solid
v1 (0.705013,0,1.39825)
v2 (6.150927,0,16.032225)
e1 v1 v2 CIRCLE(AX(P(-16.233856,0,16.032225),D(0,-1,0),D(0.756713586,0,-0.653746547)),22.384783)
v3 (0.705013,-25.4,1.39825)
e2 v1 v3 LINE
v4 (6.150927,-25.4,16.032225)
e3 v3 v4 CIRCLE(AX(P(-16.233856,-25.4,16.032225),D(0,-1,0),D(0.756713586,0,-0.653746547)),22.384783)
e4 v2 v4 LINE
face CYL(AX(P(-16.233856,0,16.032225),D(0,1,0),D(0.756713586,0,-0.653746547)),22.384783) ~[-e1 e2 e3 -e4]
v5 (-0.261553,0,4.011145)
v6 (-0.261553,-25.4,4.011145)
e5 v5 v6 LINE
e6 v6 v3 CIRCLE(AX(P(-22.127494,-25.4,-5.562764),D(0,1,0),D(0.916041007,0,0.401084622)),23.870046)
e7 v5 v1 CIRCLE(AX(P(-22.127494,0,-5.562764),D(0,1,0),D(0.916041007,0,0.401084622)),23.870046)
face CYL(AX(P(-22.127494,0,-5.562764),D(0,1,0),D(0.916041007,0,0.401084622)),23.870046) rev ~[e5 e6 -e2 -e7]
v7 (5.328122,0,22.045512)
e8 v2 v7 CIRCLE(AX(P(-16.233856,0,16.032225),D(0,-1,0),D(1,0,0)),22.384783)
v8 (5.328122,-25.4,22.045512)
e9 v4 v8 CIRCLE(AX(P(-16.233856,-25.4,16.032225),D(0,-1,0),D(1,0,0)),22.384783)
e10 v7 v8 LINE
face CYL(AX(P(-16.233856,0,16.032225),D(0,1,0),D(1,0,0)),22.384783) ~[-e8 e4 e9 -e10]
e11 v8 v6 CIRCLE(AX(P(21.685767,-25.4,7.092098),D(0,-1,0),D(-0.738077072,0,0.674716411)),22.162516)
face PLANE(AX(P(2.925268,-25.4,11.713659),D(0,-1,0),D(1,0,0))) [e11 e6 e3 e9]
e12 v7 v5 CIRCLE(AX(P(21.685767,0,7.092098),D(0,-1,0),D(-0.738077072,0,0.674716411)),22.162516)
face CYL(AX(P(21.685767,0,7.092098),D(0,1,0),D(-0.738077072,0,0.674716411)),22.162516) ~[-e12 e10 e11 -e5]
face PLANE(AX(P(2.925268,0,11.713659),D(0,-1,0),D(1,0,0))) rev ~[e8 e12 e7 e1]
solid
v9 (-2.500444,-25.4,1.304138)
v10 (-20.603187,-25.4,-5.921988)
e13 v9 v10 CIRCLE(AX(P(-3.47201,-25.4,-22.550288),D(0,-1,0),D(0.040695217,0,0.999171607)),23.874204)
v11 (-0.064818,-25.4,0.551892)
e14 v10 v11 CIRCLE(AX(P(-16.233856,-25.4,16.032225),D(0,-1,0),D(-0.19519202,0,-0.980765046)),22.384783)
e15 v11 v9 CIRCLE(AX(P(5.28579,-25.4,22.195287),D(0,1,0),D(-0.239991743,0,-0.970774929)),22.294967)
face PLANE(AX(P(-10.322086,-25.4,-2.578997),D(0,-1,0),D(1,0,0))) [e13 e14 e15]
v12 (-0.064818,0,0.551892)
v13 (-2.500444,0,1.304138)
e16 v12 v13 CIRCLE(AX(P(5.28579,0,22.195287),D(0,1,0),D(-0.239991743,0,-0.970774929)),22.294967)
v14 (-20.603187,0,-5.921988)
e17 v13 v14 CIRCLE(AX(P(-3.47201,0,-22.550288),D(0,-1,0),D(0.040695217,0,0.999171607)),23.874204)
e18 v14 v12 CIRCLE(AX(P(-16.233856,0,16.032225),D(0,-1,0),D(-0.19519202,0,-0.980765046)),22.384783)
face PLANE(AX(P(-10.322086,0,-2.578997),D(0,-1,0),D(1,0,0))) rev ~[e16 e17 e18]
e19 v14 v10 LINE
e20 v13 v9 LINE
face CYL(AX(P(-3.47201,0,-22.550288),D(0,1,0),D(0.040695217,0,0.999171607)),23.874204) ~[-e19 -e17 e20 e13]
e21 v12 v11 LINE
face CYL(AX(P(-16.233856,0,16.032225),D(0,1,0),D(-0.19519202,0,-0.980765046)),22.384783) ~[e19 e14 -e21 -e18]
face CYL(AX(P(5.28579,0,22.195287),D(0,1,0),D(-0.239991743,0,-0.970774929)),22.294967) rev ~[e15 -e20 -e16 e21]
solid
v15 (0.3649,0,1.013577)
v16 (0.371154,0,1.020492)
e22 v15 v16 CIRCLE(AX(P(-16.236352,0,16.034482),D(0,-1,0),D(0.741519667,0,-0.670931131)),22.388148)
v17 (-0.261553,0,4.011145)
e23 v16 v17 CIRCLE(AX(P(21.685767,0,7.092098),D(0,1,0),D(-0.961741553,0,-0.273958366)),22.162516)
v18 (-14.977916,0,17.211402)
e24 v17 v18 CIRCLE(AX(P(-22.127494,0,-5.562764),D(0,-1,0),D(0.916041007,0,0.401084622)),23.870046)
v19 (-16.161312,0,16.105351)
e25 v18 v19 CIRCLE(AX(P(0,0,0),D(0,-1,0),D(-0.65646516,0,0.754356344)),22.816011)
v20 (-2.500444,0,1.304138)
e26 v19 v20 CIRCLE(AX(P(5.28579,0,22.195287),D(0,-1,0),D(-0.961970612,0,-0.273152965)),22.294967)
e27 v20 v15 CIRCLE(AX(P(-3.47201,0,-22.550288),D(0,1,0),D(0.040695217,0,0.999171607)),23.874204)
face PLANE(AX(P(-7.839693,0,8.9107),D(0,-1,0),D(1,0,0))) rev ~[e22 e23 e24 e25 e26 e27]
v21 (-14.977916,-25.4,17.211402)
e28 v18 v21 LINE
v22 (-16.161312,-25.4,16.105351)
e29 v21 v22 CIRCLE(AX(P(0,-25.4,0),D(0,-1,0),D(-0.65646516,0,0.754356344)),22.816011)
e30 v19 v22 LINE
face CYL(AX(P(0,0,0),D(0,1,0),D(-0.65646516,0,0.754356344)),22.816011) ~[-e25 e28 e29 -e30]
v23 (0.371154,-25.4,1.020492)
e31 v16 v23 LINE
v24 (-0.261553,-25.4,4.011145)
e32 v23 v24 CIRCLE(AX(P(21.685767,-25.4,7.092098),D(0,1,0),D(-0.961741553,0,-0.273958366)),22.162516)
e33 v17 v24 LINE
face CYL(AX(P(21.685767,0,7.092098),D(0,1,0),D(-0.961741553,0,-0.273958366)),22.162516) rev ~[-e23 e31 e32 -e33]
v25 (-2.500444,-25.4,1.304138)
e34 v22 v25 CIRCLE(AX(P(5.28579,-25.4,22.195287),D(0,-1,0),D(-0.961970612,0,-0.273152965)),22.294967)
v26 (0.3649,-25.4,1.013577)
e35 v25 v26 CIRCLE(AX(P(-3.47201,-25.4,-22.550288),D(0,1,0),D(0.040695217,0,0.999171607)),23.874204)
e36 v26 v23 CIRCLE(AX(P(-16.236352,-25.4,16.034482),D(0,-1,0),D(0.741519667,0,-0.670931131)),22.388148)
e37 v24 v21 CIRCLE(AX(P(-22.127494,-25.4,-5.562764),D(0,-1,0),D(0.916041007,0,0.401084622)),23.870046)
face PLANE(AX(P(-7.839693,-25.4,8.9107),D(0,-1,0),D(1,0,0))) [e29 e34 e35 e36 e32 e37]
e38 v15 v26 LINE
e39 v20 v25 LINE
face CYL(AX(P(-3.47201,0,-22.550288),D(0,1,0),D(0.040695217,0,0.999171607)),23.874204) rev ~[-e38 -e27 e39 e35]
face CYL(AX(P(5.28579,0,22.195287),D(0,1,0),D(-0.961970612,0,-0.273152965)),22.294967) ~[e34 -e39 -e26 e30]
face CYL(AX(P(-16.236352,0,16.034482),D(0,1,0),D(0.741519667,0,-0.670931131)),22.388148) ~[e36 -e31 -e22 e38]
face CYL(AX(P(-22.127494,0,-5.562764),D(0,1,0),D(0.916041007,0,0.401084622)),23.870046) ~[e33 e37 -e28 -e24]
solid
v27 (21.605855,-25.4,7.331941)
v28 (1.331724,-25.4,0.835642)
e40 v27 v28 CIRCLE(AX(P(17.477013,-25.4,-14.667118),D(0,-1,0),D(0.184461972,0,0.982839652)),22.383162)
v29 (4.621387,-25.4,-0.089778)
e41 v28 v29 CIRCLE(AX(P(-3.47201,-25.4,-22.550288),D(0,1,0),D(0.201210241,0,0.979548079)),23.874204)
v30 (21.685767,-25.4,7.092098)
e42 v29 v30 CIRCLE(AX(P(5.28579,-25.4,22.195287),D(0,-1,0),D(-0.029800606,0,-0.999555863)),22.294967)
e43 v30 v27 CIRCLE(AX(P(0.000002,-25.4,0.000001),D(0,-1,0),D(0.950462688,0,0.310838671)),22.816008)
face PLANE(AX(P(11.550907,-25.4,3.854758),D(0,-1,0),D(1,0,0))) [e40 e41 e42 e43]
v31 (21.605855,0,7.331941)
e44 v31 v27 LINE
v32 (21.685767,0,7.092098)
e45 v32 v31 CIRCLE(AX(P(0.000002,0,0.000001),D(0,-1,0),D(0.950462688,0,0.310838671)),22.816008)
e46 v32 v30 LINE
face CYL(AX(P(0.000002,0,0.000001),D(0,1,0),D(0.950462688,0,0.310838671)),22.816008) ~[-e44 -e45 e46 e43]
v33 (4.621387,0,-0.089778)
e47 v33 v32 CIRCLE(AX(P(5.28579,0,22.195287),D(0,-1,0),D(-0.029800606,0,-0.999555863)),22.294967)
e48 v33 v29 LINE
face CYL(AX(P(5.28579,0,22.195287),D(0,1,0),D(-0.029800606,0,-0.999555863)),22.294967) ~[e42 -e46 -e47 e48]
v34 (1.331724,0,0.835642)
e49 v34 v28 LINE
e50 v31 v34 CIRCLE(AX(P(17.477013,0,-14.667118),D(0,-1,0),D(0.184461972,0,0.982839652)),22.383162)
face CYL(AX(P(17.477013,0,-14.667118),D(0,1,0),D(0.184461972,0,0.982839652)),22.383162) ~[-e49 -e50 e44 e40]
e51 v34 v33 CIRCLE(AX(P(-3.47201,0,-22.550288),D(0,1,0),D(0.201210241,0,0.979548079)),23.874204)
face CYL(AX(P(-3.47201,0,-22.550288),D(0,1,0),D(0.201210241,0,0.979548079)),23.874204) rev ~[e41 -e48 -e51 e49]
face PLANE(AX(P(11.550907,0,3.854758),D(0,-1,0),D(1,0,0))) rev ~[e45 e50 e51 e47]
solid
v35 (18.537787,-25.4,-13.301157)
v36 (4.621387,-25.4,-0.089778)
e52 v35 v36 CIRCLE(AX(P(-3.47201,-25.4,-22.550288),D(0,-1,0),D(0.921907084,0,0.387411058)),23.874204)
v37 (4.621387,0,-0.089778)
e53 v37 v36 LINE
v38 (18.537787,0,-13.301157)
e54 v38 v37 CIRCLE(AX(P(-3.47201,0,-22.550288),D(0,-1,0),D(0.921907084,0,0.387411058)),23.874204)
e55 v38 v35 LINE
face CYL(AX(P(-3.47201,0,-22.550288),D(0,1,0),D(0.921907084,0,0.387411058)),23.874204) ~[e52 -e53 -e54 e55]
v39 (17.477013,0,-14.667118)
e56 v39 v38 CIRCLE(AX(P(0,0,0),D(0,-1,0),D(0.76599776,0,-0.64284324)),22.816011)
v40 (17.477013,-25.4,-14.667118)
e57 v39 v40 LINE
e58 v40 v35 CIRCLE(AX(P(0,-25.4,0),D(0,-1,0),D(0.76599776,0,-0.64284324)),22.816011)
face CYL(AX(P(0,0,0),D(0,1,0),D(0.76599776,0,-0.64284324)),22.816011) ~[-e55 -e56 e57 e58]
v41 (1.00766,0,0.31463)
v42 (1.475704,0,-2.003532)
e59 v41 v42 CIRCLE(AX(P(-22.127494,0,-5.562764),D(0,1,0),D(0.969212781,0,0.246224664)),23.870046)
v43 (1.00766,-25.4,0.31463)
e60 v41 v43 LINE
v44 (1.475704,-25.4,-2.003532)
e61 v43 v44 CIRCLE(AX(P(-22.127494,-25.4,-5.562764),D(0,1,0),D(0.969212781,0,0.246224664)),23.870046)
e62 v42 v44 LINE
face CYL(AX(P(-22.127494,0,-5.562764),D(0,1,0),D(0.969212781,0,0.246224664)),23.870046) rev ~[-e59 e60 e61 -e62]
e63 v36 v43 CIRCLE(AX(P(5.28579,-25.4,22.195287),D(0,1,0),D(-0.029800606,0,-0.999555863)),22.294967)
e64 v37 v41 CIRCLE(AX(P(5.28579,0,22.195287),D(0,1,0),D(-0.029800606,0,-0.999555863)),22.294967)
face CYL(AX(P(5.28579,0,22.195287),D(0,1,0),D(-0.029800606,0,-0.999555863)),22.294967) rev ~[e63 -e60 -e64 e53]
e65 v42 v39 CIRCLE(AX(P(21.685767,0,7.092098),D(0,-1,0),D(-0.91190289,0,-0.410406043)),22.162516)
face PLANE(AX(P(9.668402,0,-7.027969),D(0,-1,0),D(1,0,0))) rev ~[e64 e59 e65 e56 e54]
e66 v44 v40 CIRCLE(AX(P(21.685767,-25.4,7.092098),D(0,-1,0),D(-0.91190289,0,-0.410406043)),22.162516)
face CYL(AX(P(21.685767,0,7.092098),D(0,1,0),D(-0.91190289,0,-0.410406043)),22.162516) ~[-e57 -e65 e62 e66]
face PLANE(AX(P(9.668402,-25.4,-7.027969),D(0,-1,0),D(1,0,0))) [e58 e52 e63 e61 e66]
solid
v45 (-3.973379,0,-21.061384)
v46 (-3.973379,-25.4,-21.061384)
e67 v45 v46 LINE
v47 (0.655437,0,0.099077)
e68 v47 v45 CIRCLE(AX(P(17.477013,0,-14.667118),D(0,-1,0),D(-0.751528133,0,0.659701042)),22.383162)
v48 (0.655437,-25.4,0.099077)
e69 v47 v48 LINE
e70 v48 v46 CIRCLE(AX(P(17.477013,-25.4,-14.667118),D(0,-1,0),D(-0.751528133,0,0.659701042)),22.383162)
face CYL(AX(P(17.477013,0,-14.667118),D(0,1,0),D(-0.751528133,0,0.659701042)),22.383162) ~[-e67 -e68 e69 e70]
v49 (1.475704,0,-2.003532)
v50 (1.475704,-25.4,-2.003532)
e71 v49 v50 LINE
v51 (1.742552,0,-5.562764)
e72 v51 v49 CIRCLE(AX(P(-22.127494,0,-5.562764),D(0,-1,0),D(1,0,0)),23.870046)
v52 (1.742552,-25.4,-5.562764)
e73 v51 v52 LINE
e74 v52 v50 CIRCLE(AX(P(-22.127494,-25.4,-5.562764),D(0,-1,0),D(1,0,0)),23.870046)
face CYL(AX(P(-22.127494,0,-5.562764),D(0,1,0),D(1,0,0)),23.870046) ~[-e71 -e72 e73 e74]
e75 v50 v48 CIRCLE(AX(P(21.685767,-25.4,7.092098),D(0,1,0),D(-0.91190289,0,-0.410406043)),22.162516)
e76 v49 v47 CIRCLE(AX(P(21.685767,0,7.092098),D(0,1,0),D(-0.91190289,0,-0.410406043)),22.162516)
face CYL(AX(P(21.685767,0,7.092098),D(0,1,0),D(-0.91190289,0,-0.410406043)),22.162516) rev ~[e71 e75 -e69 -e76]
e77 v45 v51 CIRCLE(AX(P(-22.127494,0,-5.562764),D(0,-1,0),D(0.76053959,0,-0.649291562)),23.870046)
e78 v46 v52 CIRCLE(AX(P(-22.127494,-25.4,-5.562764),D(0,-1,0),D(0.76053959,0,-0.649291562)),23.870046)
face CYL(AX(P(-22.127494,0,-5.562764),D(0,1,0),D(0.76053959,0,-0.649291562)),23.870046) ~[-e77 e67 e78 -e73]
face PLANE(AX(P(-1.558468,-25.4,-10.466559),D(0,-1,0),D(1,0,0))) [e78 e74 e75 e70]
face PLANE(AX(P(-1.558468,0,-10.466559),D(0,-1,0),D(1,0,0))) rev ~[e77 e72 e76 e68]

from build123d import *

# Parameters (mm, degrees)
F1_DEPTH = 25.4


with BuildPart() as f1:
    # F0 (on Front) → F1 (new body)
    with BuildSketch(Plane.XZ):
        with BuildLine():
            ThreePointArc((4.6213866978, -0.0897776155), (13.9343103429, 1.6461109528), (21.6857667516, 7.0920984194))
            ThreePointArc((21.6857667516, 7.0920984194), (21.6461431831, 7.2121303992), (21.6058552362, 7.3319410193))
            ThreePointArc((21.6058552362, 7.3319410193), (10.6469893917, 6.6485268007), (1.3317239543, 0.8356423686))
            ThreePointArc((1.3317239543, 0.8356423686), (2.9931346457, 0.4318681801), (4.6213866978, -0.0897776155))
        make_face()
    extrude(amount=F1_DEPTH)


with BuildPart() as f1b:
    # F0 (on Front) → F1, piece 2 (new body)
    with BuildSketch(Plane.XZ):
        with BuildLine():
            ThreePointArc((17.4770130194, -14.6671181736), (18.0203473677, -13.9941923791), (18.5377871083, -13.3011574205))
            ThreePointArc((18.5377871083, -13.3011574205), (12.9653166545, -5.2357887889), (4.6213866978, -0.0897776155))
            ThreePointArc((4.6213866978, -0.0897776155), (2.8062647028, 0.0386290803), (1.007659838, 0.3146303056))
            ThreePointArc((1.007659838, 0.3146303056), (1.2704089268, -0.8386508434), (1.4757043874, -2.0035320674))
            ThreePointArc((1.4757043874, -2.0035320674), (7.9321763784, -10.2865052807), (17.4770130194, -14.6671181736))
        make_face()
    extrude(amount=F1_DEPTH)


with BuildPart() as f1c:
    # F0 (on Front) → F1, piece 3 (new body)
    with BuildSketch(Plane.XZ):
        with BuildLine():
            ThreePointArc((1.7425521853, -5.5627638467), (1.6757467511, -3.7781533426), (1.4757043874, -2.0035320674))
            ThreePointArc((1.4757043874, -2.0035320674), (1.0387881275, -0.9626758426), (0.6554370266, 0.0990771571))
            ThreePointArc((0.6554370266, 0.0990771571), (-4.3891058934, -9.8839406609), (-3.9733789111, -21.0613835304))
            ThreePointArc((-3.9733789111, -21.0613835304), (0.2680264287, -13.8222898682), (1.7425521853, -5.5627638467))
        make_face()
    extrude(amount=F1_DEPTH)


with BuildPart() as f1d:
    # F0 (on Front) → F1, piece 4 (new body)
    with BuildSketch(Plane.XZ):
        with BuildLine():
            ThreePointArc((6.1509268163, 16.032225236), (5.9442716589, 19.0668842682), (5.3281218462, 22.0455116708))
            ThreePointArc((5.3281218462, 22.0455116708), (0.5167522435, 13.6533436879), (-0.261552872, 4.011144662))
            ThreePointArc((-0.261552872, 4.011144662), (0.2598824531, 2.7188109382), (0.7050131891, 1.3982504966))
            ThreePointArc((0.7050131891, 1.3982504966), (4.7453171219, 8.2249979448), (6.1509268163, 16.032225236))
        make_face()
    extrude(amount=F1_DEPTH)


with BuildPart() as f1e:
    # F0 (on Front) → F1, piece 5 (new body)
    with BuildSketch(Plane.XZ):
        with BuildLine():
            ThreePointArc((-0.261552872, 4.011144662), (-6.1889624772, 12.2063757044), (-14.977916047, 17.2114023393))
            ThreePointArc((-14.977916047, 17.2114023393), (-15.5794327412, 16.6688816379), (-16.1613123945, 16.1053507036))
            ThreePointArc((-16.1613123945, 16.1053507036), (-11.0976151814, 7.074124231), (-2.5004444077, 1.3041384638))
            ThreePointArc((-2.5004444077, 1.3041384638), (-1.0633867227, 1.2021041869), (0.3649000763, 1.0135767259))
            ThreePointArc((0.3649000763, 1.0135767259), (0.3680275088, 1.0170339184), (0.3711542213, 1.020491762))
            ThreePointArc((0.3711542213, 1.020491762), (0.0031770858, 2.5048966467), (-0.261552872, 4.011144662))
        make_face()
    extrude(amount=F1_DEPTH)


with BuildPart() as f1f:
    # F0 (on Front) → F1, piece 6 (new body)
    with BuildSketch(Plane.XZ):
        with BuildLine():
            ThreePointArc((-20.6031874455, -5.9219877035), (-9.5043648842, -5.3170713225), (-0.0648176749, 0.5518923477))
            ThreePointArc((-0.0648176749, 0.5518923477), (-1.2933910681, 0.8931765303), (-2.5004444077, 1.3041384638))
            ThreePointArc((-2.5004444077, 1.3041384638), (-12.3228568037, -0.3773288316), (-20.6031874455, -5.9219877035))
        make_face()
    extrude(amount=F1_DEPTH)


solid = Compound([f1.part, f1b.part, f1c.part, f1d.part, f1e.part, f1f.part])
